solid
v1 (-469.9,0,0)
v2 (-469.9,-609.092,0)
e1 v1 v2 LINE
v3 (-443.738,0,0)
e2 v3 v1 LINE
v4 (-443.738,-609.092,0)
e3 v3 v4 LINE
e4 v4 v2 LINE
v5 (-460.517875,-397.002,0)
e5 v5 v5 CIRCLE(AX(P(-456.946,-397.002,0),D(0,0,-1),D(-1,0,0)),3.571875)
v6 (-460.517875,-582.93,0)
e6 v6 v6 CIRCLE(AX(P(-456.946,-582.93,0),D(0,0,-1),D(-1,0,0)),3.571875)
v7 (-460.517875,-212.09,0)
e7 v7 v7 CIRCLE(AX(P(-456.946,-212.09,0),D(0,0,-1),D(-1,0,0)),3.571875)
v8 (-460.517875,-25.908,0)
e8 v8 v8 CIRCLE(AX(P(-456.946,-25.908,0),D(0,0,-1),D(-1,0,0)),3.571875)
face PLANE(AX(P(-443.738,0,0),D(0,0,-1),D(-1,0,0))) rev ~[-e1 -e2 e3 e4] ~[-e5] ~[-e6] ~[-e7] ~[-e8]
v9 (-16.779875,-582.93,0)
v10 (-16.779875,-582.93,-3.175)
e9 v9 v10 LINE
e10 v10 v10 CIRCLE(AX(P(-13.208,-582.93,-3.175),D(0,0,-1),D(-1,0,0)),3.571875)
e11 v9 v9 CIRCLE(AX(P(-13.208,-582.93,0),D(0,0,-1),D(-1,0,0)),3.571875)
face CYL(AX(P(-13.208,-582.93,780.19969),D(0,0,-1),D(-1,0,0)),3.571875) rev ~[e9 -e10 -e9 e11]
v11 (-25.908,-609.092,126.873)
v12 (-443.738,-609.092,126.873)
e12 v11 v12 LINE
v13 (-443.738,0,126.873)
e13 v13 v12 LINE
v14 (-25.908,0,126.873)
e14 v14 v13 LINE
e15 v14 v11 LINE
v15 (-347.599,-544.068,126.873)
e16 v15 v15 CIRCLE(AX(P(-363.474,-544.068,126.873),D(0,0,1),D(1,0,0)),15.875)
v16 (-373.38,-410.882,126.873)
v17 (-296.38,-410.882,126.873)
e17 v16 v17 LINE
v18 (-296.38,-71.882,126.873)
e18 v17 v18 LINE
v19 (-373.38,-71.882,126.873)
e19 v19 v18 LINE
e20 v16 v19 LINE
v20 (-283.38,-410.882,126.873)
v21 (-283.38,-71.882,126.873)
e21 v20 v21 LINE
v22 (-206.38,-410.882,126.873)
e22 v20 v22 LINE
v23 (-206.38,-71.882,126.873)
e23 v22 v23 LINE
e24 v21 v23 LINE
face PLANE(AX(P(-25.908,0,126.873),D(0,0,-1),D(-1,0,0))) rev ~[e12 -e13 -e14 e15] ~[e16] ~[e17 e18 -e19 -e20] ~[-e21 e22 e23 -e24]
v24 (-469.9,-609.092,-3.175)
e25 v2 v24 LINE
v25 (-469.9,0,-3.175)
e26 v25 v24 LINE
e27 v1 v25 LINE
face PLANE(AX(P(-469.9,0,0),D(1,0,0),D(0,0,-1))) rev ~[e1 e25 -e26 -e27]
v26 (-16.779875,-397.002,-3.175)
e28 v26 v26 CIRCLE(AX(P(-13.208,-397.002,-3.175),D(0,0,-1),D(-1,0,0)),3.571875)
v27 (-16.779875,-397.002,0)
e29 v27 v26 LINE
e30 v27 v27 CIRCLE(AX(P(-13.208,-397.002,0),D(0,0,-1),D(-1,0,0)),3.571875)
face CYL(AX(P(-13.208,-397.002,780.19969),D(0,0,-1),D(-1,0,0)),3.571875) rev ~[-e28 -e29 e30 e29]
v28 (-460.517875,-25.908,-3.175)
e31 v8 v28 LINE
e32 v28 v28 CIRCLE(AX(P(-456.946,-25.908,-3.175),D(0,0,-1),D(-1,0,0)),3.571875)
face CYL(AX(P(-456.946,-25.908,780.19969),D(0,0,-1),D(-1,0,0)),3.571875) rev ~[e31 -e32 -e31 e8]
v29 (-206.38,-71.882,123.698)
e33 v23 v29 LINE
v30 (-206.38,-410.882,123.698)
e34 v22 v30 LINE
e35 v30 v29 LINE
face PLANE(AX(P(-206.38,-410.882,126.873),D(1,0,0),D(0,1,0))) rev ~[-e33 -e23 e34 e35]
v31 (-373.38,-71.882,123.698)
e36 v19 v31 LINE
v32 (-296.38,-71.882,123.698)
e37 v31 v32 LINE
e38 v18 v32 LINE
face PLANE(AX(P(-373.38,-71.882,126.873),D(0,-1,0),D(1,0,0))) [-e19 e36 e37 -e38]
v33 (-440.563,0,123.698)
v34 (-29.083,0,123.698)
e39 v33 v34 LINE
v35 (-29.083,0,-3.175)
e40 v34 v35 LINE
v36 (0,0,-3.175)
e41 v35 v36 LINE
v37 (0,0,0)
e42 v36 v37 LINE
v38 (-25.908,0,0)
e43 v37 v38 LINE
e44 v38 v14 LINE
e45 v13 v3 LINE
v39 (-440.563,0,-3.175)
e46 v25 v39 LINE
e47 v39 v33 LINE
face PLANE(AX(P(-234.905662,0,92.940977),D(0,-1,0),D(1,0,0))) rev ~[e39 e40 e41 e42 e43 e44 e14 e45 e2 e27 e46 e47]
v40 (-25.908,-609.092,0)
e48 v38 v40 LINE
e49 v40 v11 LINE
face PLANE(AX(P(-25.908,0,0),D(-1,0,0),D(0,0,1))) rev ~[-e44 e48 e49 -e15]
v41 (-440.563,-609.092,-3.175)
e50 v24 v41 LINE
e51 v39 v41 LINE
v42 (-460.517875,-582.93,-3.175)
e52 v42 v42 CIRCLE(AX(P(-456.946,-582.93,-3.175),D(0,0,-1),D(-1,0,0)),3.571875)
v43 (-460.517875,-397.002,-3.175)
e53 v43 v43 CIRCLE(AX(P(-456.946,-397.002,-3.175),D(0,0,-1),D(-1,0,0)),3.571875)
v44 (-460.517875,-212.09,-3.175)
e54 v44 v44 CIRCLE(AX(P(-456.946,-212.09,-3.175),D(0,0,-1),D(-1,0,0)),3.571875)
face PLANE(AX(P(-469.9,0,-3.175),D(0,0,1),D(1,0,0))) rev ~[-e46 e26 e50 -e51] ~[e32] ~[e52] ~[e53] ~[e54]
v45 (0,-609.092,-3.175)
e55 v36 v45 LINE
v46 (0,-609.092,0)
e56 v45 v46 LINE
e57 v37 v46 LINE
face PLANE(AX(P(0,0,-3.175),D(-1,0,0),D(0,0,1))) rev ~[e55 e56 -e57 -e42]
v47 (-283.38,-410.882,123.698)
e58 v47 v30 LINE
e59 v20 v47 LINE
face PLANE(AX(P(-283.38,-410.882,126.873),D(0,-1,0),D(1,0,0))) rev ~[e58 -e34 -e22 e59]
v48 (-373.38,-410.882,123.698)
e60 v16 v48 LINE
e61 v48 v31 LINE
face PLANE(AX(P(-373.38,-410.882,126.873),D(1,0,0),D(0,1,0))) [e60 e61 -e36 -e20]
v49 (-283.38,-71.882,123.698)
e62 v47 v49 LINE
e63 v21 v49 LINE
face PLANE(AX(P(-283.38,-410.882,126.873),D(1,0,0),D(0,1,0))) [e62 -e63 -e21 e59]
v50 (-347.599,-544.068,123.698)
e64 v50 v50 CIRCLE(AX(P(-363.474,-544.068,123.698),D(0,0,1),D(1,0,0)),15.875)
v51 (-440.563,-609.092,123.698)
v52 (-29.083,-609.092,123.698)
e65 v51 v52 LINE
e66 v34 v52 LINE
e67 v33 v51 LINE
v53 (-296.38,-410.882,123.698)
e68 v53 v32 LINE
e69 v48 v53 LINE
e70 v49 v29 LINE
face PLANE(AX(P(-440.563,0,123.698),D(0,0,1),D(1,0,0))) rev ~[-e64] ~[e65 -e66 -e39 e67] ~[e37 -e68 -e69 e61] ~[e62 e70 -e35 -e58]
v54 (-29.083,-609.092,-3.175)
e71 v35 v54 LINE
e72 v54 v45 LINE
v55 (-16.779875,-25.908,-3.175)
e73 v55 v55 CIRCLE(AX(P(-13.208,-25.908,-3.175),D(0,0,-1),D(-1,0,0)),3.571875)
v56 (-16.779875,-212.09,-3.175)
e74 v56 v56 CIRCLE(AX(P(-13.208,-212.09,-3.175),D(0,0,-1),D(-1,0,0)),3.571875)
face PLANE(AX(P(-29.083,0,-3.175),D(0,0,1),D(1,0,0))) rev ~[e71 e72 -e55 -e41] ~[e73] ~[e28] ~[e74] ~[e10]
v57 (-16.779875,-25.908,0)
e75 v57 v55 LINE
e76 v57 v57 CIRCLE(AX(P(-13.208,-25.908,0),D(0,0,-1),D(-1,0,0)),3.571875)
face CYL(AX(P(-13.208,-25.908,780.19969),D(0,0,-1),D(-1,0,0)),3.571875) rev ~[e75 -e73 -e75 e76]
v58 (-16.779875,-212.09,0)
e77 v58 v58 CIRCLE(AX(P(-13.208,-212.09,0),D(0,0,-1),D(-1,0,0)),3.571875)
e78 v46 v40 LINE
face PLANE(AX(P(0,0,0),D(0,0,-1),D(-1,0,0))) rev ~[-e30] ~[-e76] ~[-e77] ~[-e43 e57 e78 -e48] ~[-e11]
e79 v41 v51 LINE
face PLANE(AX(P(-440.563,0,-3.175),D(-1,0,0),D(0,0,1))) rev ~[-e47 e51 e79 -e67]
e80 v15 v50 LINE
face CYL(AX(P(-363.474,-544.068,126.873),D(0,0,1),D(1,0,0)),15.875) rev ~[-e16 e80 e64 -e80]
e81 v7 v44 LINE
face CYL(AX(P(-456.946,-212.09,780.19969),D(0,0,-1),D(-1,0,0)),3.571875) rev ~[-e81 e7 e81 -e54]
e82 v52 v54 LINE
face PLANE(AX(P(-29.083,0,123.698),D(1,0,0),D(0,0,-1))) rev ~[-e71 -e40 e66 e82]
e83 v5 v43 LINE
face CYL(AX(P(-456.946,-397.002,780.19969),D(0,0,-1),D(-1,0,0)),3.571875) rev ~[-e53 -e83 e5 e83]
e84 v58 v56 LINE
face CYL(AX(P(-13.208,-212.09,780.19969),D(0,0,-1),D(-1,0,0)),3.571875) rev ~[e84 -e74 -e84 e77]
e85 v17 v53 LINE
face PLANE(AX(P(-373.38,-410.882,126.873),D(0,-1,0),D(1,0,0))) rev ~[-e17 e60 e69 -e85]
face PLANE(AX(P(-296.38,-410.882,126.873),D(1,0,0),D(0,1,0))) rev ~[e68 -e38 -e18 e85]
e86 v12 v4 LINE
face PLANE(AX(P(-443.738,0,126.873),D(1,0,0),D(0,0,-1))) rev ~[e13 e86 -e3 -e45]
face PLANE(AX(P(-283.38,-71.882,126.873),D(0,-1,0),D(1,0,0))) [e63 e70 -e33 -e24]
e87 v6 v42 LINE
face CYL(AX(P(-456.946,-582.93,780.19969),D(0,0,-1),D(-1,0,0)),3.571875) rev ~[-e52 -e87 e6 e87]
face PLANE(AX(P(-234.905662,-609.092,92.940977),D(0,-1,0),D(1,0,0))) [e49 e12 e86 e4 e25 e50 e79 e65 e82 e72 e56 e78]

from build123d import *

# Parameters (mm, degrees)
F1_DEPTH = 609.092
F2_W     = 77
F2_H     = 339
F3_DEPTH = 25.4
F4_R     = 15.875
F5_DEPTH = 25.4
F7_D     = 7.14375


# Not quite as in the source:
# - a length typed as a fraction of an inch, garbled in the dataset ("3 / 203.2 mm" for 3/8 in), is restored


with BuildPart() as f1:
    # F0 (on Front) → F1 (new body)
    with BuildSketch(Plane.XZ):
        Polygon((0, -3.175), (0, 0), (-25.908, 0), (-25.908, 126.873), (-443.738, 126.873), (-443.738, 0), (-469.9, 0), (-469.9, -3.175), (-440.563, -3.175), (-440.563, 123.698), (-29.083, 123.698), (-29.083, -3.175), align=None)
    extrude(amount=F1_DEPTH)

    # F2 (on face) → F3 (cut)
    with BuildSketch(Plane.XY.offset(126.873)):
        with Locations((-334.88, -241.382)):
            Rectangle(F2_W, F2_H)
        with Locations((-244.88, -241.382)):
            Rectangle(F2_W, F2_H)
    extrude(amount=-F3_DEPTH, mode=Mode.SUBTRACT)

    # F4 (on face) → F5 (cut)
    with BuildSketch(Plane.XY.offset(126.873)):
        with Locations((-363.474, -544.068)):
            Circle(F4_R)
    extrude(amount=-F5_DEPTH, mode=Mode.SUBTRACT)

    # F7 (through all)
    with Locations(Plane.XY):
        with Locations((-456.946, -25.908), (-456.946, -212.09), (-456.946, -397.002), (-456.946, -582.93), (-13.208, -582.93), (-13.208, -397.002), (-13.208, -212.09), (-13.208, -25.908)):
            Hole(F7_D / 2)


solid = f1.part
